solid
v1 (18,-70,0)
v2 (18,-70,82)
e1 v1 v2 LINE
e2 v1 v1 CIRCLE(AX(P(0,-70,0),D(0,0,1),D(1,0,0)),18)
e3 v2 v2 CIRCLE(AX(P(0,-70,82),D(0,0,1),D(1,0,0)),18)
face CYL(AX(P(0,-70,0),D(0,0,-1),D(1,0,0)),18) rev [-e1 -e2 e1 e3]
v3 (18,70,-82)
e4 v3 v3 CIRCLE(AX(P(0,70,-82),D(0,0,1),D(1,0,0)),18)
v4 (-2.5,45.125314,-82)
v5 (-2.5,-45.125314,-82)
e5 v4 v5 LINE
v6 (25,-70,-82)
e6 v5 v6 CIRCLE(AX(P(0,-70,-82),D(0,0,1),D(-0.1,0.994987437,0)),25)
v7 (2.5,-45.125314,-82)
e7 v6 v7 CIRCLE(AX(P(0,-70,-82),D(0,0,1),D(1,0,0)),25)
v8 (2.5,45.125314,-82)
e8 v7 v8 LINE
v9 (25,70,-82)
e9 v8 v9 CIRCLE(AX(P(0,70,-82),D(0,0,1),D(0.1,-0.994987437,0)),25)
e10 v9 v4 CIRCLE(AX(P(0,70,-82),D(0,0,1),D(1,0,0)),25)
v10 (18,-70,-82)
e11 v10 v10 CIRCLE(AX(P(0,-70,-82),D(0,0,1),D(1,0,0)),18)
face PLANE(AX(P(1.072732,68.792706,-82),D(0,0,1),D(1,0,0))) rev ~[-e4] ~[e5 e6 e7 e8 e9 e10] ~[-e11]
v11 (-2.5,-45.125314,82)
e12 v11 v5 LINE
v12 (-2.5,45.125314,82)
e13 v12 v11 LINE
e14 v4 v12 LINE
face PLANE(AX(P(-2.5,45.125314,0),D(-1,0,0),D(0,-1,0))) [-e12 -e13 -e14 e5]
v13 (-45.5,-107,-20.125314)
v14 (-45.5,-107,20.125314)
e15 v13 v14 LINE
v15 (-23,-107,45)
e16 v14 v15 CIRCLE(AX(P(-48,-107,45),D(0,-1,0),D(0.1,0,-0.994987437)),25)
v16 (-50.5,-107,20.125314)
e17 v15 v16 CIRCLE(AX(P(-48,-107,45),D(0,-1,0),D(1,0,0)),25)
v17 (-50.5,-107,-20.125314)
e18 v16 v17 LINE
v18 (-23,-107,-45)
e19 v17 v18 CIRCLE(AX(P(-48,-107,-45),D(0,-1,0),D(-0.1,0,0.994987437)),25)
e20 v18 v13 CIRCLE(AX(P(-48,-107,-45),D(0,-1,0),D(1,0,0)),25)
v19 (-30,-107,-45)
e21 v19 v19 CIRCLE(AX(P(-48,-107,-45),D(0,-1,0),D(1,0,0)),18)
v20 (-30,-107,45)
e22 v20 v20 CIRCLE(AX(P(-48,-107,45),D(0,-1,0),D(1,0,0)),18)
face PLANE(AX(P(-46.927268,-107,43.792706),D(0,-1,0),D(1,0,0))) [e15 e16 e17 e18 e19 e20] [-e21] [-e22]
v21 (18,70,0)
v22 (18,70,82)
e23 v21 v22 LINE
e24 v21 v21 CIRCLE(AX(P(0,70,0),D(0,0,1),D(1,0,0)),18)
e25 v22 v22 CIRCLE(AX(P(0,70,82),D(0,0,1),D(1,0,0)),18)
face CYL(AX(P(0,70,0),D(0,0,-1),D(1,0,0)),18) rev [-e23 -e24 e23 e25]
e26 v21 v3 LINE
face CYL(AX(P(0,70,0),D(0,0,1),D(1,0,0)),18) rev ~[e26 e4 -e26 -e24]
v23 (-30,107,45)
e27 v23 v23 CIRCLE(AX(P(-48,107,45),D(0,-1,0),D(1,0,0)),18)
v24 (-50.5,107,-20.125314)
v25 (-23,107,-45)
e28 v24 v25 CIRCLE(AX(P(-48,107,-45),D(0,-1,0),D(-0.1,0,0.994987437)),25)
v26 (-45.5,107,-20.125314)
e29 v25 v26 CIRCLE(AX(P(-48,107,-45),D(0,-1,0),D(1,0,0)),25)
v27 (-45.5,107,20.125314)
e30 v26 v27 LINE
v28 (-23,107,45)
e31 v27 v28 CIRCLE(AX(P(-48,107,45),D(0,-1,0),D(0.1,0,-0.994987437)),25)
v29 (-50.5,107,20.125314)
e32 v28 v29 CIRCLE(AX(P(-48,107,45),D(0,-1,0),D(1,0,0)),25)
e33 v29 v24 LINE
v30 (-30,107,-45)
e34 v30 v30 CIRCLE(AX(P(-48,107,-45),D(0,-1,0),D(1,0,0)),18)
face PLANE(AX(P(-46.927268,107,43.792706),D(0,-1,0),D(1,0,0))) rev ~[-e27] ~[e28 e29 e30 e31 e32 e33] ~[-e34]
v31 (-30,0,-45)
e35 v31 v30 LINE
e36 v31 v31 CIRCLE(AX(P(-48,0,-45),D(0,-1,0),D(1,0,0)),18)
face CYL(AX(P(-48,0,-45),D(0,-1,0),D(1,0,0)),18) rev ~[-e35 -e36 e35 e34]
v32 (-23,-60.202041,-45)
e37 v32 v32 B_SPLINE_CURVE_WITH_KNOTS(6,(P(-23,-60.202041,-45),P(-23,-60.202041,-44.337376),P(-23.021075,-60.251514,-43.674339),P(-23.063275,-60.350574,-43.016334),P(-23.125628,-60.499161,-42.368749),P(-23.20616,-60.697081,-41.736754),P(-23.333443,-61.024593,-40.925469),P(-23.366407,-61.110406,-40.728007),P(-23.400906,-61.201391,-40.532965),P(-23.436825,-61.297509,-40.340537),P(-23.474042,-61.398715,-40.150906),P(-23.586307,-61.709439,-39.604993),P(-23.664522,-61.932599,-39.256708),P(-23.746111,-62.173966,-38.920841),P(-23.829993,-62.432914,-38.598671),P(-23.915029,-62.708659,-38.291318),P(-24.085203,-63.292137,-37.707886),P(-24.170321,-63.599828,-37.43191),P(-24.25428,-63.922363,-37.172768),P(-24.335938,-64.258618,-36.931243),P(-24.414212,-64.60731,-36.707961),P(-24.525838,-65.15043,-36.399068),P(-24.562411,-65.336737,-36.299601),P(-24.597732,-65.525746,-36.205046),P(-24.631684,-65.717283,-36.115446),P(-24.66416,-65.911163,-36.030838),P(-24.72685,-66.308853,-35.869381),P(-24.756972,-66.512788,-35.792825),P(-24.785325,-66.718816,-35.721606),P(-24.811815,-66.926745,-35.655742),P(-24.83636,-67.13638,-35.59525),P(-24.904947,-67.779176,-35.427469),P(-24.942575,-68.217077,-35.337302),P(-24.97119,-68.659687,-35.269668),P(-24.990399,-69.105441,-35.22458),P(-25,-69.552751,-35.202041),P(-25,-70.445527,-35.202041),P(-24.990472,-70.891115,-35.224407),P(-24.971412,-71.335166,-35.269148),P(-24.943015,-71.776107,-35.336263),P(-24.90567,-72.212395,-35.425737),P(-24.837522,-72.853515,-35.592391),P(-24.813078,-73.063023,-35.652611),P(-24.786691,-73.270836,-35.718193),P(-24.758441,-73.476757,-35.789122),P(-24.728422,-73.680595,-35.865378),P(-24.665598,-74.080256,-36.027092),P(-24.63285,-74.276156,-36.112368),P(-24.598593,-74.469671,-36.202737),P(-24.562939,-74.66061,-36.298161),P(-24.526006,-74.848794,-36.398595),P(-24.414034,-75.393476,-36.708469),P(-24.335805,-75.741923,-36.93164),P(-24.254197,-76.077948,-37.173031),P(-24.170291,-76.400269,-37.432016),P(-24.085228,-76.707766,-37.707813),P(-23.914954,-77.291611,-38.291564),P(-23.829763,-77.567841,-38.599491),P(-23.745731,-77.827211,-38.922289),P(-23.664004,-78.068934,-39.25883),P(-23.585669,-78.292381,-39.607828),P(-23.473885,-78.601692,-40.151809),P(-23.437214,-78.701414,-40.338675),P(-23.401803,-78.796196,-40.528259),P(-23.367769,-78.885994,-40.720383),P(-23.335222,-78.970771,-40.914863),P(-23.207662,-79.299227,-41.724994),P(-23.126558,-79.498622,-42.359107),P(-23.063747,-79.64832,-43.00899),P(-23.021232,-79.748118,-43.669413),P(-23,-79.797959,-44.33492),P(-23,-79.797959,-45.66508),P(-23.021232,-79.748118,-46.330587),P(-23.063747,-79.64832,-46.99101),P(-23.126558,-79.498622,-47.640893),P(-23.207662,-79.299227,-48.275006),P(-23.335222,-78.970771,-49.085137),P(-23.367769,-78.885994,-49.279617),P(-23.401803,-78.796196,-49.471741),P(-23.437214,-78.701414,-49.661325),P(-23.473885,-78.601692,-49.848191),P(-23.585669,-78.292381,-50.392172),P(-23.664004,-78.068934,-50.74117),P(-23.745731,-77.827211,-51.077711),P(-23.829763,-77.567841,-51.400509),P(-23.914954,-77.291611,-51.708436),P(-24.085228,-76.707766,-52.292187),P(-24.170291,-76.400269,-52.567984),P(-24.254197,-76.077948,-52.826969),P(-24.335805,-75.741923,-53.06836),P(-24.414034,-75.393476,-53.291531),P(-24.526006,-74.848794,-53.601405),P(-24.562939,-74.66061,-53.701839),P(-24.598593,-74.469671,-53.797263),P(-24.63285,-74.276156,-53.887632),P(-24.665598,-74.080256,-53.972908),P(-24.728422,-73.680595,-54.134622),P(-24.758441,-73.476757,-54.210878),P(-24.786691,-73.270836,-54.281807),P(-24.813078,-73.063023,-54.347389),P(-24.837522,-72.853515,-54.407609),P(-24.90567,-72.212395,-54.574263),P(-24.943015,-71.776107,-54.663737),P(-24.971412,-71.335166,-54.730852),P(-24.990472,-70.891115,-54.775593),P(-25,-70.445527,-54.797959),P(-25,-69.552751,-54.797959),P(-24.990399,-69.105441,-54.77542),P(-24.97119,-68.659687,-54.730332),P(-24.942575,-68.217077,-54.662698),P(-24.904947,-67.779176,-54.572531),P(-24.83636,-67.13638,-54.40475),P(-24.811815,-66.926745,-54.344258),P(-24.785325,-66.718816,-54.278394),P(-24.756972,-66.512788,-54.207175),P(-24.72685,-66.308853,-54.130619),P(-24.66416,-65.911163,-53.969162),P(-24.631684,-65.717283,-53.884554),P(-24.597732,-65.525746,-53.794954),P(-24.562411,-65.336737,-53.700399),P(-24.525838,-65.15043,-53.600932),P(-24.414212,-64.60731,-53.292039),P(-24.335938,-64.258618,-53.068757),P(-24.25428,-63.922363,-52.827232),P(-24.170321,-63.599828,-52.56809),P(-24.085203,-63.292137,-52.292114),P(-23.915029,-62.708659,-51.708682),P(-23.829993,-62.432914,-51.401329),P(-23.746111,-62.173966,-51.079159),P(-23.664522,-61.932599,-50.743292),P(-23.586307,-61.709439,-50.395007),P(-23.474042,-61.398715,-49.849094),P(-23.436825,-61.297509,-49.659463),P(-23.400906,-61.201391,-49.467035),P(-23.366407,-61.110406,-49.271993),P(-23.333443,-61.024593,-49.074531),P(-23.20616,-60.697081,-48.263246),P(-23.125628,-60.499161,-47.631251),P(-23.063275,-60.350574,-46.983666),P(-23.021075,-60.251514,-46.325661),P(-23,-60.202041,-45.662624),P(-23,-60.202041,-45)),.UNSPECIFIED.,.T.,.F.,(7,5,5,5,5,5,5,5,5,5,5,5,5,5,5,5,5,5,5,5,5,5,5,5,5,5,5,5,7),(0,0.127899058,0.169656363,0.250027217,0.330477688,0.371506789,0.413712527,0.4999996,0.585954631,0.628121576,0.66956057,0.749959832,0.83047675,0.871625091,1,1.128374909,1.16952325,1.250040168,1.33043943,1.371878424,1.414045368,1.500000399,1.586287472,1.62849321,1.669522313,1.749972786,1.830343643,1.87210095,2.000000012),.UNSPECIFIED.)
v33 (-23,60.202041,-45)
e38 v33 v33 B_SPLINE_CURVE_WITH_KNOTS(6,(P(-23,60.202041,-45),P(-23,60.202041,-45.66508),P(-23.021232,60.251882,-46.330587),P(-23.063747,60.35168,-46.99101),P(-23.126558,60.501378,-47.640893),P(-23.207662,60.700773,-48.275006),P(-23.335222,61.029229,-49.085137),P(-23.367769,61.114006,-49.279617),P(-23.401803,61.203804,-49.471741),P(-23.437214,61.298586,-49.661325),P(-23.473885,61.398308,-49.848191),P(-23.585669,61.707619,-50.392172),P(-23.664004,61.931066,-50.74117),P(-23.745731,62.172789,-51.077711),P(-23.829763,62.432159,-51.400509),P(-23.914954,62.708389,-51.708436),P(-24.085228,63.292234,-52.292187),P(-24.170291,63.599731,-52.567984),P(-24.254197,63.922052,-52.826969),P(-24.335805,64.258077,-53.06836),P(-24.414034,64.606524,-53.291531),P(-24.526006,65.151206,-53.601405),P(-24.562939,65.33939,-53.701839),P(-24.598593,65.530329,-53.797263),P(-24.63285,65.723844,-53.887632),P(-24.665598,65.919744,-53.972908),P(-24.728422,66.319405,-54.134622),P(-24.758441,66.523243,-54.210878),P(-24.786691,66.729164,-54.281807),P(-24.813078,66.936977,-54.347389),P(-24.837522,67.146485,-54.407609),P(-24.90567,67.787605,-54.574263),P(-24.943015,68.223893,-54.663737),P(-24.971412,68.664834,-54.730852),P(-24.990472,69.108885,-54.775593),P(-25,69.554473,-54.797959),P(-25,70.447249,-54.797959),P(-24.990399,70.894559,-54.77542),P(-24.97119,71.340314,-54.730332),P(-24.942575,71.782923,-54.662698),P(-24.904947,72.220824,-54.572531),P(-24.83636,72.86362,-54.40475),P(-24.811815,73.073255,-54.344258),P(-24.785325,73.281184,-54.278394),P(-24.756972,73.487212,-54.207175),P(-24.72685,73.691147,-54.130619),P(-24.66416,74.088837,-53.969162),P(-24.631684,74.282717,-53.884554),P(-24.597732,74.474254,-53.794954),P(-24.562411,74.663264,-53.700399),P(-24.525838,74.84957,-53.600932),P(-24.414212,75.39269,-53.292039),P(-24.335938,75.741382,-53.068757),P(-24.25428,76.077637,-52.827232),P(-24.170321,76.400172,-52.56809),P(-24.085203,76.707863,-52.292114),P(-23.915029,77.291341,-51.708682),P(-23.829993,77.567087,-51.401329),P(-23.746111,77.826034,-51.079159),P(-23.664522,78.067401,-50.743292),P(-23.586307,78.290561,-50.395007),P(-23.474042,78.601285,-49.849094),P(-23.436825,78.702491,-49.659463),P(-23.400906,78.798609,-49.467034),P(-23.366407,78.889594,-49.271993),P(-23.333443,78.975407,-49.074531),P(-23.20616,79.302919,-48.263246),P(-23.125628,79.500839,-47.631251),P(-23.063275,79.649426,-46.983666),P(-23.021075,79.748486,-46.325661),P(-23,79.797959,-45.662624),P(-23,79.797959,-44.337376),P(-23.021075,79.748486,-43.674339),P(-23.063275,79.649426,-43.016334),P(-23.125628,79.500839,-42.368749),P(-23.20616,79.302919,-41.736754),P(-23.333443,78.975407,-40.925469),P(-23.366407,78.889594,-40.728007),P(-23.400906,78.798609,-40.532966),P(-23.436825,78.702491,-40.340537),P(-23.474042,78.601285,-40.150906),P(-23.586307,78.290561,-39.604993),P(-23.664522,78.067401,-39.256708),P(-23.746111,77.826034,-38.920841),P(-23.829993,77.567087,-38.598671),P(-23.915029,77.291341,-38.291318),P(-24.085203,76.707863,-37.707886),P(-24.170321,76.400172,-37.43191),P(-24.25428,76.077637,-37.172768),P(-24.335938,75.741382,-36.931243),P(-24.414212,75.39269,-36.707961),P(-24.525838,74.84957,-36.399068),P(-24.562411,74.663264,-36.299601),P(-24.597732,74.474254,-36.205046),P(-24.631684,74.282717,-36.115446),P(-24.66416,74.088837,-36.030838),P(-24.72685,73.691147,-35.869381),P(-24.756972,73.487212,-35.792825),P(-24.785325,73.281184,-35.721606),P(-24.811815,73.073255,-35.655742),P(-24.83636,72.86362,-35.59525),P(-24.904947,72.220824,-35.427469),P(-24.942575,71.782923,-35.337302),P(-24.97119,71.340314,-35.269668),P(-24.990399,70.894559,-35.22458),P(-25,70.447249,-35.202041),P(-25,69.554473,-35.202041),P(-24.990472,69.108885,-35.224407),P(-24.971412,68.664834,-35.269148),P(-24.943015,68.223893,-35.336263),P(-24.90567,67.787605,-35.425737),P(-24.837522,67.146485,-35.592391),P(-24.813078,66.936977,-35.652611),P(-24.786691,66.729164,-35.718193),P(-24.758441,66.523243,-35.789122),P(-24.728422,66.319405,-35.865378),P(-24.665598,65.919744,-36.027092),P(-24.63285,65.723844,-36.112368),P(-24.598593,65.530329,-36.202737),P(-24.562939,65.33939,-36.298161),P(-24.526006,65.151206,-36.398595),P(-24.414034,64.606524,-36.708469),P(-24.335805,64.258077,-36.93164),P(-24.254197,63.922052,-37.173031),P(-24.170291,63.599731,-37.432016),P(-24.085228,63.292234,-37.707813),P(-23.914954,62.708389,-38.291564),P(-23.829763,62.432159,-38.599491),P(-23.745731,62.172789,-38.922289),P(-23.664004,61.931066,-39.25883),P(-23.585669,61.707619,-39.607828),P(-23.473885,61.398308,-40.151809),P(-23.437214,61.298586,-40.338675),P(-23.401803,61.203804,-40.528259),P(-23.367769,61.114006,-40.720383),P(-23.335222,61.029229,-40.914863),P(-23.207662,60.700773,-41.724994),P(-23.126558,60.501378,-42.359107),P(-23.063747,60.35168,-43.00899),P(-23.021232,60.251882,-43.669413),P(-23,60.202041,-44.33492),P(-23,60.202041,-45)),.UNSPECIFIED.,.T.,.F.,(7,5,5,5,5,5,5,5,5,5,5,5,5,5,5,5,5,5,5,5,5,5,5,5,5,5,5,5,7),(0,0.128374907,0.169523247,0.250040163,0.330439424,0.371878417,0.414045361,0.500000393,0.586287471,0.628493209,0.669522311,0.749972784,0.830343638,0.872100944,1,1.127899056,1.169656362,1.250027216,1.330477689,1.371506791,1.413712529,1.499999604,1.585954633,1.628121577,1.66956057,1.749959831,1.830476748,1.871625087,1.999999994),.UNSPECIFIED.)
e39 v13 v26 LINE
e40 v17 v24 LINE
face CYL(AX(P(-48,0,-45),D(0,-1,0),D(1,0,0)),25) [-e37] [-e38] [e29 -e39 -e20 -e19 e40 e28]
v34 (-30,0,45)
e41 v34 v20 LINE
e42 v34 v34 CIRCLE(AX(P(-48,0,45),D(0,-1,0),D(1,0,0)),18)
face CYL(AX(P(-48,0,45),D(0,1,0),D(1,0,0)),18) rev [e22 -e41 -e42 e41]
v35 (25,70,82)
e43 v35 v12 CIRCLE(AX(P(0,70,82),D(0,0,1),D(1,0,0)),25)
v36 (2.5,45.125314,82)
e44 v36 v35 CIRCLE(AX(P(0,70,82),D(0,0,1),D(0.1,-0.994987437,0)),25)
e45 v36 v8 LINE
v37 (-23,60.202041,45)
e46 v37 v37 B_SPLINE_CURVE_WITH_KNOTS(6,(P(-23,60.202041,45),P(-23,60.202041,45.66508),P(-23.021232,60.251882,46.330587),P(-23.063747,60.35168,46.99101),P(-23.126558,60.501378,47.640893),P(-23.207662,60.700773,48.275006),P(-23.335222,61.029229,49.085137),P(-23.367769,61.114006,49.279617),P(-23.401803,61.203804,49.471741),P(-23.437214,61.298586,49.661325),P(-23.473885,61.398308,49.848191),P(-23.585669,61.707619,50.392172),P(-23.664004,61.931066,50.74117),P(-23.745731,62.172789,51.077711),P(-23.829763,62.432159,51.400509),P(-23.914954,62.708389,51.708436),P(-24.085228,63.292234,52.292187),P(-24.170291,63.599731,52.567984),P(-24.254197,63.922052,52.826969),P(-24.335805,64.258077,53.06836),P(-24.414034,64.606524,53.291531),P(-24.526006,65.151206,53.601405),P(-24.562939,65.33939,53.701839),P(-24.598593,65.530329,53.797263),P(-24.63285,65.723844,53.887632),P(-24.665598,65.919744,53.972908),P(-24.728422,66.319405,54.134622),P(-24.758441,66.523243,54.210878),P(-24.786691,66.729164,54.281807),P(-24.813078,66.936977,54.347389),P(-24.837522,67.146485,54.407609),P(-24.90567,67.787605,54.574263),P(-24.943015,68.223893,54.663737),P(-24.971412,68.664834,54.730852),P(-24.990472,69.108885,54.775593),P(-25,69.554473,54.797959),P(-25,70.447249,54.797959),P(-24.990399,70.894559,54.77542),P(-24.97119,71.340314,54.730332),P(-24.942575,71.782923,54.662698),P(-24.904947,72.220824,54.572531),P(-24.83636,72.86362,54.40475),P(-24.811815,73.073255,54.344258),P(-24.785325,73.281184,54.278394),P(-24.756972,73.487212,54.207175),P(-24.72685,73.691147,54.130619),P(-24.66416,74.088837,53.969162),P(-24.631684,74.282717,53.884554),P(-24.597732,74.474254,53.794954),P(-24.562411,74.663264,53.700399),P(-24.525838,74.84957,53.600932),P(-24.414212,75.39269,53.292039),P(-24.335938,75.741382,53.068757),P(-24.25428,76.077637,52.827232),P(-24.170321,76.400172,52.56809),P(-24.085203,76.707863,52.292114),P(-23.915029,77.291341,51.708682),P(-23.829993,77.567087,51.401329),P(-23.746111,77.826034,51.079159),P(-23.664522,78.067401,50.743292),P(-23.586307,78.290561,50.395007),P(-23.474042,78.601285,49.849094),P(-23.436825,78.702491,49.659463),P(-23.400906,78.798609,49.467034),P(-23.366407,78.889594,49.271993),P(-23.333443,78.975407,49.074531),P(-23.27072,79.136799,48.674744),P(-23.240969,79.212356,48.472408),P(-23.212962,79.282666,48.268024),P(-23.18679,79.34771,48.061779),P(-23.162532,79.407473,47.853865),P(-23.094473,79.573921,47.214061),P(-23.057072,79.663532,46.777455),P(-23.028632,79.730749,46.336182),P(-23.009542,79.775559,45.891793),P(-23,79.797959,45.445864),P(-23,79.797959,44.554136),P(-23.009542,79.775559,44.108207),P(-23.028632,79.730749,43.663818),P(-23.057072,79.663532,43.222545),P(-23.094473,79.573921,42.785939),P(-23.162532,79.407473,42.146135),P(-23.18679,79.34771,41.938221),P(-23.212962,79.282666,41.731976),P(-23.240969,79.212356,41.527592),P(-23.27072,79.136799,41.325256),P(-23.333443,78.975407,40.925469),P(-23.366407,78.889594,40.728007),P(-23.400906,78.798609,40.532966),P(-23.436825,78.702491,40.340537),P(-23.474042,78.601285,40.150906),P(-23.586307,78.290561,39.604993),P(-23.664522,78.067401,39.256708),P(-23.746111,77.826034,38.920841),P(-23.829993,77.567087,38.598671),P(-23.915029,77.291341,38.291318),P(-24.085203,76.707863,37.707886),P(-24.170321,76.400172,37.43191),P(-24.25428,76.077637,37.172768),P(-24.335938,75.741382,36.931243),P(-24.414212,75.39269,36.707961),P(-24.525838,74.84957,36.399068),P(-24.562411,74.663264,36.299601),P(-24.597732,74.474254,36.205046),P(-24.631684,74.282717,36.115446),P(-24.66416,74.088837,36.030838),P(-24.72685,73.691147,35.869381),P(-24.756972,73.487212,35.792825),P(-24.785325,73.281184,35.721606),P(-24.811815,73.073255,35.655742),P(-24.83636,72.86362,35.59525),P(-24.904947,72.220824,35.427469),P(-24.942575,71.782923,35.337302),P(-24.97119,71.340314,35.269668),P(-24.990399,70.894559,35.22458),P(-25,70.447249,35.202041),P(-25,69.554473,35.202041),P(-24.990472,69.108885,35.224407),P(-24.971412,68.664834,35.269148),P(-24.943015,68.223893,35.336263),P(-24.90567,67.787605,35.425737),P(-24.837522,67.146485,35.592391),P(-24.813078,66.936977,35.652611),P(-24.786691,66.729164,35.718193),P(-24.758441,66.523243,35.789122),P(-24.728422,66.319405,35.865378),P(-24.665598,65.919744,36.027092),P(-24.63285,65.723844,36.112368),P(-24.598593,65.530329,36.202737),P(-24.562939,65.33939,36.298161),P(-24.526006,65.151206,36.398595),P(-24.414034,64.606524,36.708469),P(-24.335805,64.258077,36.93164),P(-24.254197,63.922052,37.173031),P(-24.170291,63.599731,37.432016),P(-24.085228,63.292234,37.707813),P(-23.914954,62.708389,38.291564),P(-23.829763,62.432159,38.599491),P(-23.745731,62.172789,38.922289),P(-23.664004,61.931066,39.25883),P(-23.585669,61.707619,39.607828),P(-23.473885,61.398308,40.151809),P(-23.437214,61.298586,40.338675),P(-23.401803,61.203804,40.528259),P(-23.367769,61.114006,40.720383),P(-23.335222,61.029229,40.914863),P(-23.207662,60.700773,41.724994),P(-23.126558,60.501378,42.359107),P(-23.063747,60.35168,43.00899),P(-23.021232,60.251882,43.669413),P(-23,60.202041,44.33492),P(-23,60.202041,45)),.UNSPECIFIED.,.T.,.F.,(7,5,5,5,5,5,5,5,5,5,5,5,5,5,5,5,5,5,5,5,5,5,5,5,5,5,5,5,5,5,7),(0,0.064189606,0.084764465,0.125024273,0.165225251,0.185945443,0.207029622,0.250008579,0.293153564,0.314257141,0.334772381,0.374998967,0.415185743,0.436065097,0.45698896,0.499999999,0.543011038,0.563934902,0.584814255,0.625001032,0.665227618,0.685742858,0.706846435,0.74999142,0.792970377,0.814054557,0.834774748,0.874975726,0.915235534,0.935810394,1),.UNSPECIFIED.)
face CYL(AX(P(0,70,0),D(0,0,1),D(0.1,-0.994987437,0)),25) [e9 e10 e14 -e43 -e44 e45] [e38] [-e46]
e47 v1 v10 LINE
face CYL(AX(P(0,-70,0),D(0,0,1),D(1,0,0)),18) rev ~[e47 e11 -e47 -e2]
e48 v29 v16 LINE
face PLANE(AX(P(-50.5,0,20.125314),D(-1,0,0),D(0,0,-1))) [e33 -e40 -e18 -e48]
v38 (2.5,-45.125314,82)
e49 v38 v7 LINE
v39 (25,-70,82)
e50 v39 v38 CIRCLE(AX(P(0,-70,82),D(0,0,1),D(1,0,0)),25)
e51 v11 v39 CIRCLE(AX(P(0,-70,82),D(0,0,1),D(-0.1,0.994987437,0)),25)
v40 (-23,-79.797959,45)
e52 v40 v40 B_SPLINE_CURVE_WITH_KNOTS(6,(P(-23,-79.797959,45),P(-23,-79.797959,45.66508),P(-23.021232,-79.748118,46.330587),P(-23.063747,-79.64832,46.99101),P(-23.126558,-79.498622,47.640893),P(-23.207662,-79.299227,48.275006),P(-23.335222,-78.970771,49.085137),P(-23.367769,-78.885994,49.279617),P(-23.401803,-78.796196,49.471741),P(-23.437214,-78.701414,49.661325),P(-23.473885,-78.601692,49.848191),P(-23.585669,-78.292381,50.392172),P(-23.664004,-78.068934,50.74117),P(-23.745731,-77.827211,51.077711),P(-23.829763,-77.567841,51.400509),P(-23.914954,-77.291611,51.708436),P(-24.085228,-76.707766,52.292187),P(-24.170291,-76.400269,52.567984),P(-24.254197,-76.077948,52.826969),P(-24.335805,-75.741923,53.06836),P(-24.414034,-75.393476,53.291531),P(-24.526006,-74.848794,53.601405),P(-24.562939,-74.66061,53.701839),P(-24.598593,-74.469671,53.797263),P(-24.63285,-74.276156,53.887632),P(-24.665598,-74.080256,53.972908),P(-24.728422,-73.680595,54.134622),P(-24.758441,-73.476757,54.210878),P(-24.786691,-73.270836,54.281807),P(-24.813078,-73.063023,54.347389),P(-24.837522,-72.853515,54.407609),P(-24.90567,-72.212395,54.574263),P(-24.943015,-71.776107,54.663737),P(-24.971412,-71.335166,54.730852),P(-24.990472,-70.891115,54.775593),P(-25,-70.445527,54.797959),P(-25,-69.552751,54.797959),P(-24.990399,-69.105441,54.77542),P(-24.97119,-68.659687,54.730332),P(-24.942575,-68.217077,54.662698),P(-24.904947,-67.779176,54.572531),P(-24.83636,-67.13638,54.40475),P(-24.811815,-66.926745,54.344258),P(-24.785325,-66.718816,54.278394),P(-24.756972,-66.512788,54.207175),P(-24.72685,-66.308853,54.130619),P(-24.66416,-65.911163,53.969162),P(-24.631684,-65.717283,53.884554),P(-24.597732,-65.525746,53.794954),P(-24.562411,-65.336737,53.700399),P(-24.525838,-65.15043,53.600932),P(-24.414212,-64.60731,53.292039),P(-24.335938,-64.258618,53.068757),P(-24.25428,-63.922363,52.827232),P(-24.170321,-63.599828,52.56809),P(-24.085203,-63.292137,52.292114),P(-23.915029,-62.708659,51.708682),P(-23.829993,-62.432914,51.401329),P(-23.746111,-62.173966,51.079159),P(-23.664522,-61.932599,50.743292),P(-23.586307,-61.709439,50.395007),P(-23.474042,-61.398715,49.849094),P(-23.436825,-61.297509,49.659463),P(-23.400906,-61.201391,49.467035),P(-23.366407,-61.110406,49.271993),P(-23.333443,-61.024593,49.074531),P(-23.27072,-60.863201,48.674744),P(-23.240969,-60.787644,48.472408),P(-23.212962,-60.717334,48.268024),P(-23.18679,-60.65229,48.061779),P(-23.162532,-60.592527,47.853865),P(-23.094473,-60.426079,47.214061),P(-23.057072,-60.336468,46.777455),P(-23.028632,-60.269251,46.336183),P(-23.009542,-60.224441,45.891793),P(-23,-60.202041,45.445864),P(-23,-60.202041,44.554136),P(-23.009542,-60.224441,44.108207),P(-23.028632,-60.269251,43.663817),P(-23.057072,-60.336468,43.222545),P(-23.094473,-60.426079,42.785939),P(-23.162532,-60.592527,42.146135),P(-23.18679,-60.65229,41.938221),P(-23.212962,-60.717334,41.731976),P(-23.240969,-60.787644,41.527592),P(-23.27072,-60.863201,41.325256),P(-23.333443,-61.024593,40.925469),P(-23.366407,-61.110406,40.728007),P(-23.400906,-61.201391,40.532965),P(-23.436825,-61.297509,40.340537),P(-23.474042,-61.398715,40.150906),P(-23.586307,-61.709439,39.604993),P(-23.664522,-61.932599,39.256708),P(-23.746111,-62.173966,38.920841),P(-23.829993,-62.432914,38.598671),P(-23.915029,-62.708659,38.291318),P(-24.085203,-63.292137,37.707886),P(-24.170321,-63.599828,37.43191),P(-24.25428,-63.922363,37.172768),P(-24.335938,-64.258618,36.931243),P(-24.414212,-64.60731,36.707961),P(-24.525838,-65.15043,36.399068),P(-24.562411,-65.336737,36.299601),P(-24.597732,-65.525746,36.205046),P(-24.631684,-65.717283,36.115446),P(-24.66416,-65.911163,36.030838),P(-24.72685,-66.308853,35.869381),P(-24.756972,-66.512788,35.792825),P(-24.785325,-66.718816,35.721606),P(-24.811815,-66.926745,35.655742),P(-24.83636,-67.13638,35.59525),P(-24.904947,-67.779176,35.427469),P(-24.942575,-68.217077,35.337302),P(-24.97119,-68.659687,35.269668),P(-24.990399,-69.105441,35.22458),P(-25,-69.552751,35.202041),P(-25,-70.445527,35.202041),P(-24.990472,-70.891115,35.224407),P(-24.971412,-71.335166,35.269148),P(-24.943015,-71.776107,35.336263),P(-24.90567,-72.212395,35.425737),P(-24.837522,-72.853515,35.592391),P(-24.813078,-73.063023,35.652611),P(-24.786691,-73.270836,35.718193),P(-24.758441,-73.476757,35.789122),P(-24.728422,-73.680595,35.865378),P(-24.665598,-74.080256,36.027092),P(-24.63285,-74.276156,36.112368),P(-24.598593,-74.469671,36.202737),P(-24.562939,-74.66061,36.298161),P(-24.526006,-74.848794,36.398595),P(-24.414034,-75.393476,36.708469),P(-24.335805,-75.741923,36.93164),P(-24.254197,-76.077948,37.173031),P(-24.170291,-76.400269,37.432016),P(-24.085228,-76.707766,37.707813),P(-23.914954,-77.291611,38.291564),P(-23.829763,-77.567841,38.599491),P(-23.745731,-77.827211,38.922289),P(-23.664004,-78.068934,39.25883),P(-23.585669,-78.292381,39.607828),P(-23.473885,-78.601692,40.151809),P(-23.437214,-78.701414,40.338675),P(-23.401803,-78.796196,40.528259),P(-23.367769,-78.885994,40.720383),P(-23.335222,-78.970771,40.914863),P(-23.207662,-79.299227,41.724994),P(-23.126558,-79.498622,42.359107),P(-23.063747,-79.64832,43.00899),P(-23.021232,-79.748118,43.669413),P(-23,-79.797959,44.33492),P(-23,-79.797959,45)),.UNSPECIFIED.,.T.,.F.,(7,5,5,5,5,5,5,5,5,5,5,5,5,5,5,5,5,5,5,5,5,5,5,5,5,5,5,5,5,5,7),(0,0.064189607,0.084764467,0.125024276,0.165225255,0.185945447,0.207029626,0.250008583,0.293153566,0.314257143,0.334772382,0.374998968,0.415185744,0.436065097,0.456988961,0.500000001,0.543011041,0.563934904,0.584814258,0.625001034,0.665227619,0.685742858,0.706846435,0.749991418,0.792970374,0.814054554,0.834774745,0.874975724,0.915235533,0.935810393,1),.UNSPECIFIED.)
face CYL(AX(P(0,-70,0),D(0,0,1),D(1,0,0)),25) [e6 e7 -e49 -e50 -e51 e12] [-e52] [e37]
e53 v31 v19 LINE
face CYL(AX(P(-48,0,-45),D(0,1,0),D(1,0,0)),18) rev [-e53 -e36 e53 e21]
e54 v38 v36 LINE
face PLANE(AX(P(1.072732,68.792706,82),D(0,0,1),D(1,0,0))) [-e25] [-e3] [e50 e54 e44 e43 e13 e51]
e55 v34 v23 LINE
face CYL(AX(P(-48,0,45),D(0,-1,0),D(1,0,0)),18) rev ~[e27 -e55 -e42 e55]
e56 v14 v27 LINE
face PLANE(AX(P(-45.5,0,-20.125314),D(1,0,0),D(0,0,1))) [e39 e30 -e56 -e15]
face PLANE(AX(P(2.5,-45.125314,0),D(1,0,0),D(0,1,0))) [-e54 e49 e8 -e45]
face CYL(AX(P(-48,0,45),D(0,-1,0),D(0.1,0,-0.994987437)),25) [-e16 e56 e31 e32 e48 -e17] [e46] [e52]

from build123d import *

# Parameters (mm, degrees)
F2_DEPTH      = 107
F2_DEPTH_BACK = 107
F0_R          = 18
F3_DEPTH      = 107
F3_DEPTH_BACK = 107
F1_R          = 18
F4_DEPTH      = 82
F4_DEPTH_BACK = 82


# Not quite as in the source:
# - a feature of the source that left no trace in its solid (it failed there, or was rolled back) is left out


with BuildPart() as f2:
    # F0 (on Front) → F2 (new body, two sides)
    with BuildSketch(Plane.XZ) as f2_sk:
        with BuildLine():
            ThreePointArc((-45.5, 20.1253140723), (-48, 20), (-50.5, 20.1253140723))
            Line((-50.5, 20.1253140723), (-50.5, -20.1253140723))
            ThreePointArc((-50.5, -20.1253140723), (-48, -20), (-45.5, -20.1253140723))
            Line((-45.5, -20.1253140723), (-45.5, 20.1253140723))
        make_face()
        with BuildLine():
            Line((-45.5, 20.1253140723), (-50.5, 20.1253140723))
            ThreePointArc((-50.5, 20.1253140723), (-48, 20), (-45.5, 20.1253140723))
        make_face()
        with BuildLine():
            ThreePointArc((-45.5, -20.1253140723), (-48, -20), (-50.5, -20.1253140723))
            Line((-50.5, -20.1253140723), (-45.5, -20.1253140723))
        make_face()
    extrude(amount=F2_DEPTH)
    extrude(f2_sk.sketch, amount=-F2_DEPTH_BACK)

    # F0 (on Front) → F3 (join, two sides)
    with BuildSketch(Plane.XZ) as f3_sk:
        with BuildLine():
            ThreePointArc((-45.5, 20.1253140723), (-29.4595037823, 28.2294901688), (-23, 45))
            ThreePointArc((-23, 45), (-64.7705098312, 63.5404962177), (-50.5, 20.1253140723))
            Line((-50.5, 20.1253140723), (-45.5, 20.1253140723))
        make_face()
        with Locations((-48, 45)):
            Circle(F0_R, mode=Mode.SUBTRACT)
        with BuildLine():
            Line((-45.5, -20.1253140723), (-50.5, -20.1253140723))
            ThreePointArc((-50.5, -20.1253140723), (-64.7705098312, -63.5404962177), (-23, -45))
            ThreePointArc((-23, -45), (-29.4595037823, -28.2294901688), (-45.5, -20.1253140723))
        make_face()
        with Locations((-48, -45)):
            Circle(F0_R, mode=Mode.SUBTRACT)
    extrude(amount=F3_DEPTH)
    extrude(f3_sk.sketch, amount=-F3_DEPTH_BACK)

    # F1 (on Top) → F4 (join, two sides)
    with BuildSketch(Plane.XY) as f4_sk:
        with BuildLine():
            ThreePointArc((2.5, 45.1253140723), (18.5404962177, 53.2294901688), (25, 70))
            ThreePointArc((25, 70), (-16.7705098312, 88.5404962177), (-2.5, 45.1253140723))
            Line((-2.5, 45.1253140723), (2.5, 45.1253140723))
        make_face()
        with Locations((0, 70)):
            Circle(F1_R, mode=Mode.SUBTRACT)
        with BuildLine():
            Line((2.5, 45.1253140723), (-2.5, 45.1253140723))
            ThreePointArc((-2.5, 45.1253140723), (0, 45), (2.5, 45.1253140723))
        make_face()
        with BuildLine():
            ThreePointArc((2.5, 45.1253140723), (0, 45), (-2.5, 45.1253140723))
            Line((-2.5, 45.1253140723), (-2.5, -45.1253140723))
            ThreePointArc((-2.5, -45.1253140723), (0, -45), (2.5, -45.1253140723))
            Line((2.5, -45.1253140723), (2.5, 45.1253140723))
        make_face()
        with BuildLine():
            ThreePointArc((2.5, -45.1253140723), (0, -45), (-2.5, -45.1253140723))
            Line((-2.5, -45.1253140723), (2.5, -45.1253140723))
        make_face()
        with BuildLine():
            Line((2.5, -45.1253140723), (-2.5, -45.1253140723))
            ThreePointArc((-2.5, -45.1253140723), (-16.7705098312, -88.5404962177), (25, -70))
            ThreePointArc((25, -70), (18.5404962177, -53.2294901688), (2.5, -45.1253140723))
        make_face()
        with Locations((0, -70)):
            Circle(F1_R, mode=Mode.SUBTRACT)
    extrude(amount=F4_DEPTH)
    extrude(f4_sk.sketch, amount=-F4_DEPTH_BACK)


solid = f2.part
